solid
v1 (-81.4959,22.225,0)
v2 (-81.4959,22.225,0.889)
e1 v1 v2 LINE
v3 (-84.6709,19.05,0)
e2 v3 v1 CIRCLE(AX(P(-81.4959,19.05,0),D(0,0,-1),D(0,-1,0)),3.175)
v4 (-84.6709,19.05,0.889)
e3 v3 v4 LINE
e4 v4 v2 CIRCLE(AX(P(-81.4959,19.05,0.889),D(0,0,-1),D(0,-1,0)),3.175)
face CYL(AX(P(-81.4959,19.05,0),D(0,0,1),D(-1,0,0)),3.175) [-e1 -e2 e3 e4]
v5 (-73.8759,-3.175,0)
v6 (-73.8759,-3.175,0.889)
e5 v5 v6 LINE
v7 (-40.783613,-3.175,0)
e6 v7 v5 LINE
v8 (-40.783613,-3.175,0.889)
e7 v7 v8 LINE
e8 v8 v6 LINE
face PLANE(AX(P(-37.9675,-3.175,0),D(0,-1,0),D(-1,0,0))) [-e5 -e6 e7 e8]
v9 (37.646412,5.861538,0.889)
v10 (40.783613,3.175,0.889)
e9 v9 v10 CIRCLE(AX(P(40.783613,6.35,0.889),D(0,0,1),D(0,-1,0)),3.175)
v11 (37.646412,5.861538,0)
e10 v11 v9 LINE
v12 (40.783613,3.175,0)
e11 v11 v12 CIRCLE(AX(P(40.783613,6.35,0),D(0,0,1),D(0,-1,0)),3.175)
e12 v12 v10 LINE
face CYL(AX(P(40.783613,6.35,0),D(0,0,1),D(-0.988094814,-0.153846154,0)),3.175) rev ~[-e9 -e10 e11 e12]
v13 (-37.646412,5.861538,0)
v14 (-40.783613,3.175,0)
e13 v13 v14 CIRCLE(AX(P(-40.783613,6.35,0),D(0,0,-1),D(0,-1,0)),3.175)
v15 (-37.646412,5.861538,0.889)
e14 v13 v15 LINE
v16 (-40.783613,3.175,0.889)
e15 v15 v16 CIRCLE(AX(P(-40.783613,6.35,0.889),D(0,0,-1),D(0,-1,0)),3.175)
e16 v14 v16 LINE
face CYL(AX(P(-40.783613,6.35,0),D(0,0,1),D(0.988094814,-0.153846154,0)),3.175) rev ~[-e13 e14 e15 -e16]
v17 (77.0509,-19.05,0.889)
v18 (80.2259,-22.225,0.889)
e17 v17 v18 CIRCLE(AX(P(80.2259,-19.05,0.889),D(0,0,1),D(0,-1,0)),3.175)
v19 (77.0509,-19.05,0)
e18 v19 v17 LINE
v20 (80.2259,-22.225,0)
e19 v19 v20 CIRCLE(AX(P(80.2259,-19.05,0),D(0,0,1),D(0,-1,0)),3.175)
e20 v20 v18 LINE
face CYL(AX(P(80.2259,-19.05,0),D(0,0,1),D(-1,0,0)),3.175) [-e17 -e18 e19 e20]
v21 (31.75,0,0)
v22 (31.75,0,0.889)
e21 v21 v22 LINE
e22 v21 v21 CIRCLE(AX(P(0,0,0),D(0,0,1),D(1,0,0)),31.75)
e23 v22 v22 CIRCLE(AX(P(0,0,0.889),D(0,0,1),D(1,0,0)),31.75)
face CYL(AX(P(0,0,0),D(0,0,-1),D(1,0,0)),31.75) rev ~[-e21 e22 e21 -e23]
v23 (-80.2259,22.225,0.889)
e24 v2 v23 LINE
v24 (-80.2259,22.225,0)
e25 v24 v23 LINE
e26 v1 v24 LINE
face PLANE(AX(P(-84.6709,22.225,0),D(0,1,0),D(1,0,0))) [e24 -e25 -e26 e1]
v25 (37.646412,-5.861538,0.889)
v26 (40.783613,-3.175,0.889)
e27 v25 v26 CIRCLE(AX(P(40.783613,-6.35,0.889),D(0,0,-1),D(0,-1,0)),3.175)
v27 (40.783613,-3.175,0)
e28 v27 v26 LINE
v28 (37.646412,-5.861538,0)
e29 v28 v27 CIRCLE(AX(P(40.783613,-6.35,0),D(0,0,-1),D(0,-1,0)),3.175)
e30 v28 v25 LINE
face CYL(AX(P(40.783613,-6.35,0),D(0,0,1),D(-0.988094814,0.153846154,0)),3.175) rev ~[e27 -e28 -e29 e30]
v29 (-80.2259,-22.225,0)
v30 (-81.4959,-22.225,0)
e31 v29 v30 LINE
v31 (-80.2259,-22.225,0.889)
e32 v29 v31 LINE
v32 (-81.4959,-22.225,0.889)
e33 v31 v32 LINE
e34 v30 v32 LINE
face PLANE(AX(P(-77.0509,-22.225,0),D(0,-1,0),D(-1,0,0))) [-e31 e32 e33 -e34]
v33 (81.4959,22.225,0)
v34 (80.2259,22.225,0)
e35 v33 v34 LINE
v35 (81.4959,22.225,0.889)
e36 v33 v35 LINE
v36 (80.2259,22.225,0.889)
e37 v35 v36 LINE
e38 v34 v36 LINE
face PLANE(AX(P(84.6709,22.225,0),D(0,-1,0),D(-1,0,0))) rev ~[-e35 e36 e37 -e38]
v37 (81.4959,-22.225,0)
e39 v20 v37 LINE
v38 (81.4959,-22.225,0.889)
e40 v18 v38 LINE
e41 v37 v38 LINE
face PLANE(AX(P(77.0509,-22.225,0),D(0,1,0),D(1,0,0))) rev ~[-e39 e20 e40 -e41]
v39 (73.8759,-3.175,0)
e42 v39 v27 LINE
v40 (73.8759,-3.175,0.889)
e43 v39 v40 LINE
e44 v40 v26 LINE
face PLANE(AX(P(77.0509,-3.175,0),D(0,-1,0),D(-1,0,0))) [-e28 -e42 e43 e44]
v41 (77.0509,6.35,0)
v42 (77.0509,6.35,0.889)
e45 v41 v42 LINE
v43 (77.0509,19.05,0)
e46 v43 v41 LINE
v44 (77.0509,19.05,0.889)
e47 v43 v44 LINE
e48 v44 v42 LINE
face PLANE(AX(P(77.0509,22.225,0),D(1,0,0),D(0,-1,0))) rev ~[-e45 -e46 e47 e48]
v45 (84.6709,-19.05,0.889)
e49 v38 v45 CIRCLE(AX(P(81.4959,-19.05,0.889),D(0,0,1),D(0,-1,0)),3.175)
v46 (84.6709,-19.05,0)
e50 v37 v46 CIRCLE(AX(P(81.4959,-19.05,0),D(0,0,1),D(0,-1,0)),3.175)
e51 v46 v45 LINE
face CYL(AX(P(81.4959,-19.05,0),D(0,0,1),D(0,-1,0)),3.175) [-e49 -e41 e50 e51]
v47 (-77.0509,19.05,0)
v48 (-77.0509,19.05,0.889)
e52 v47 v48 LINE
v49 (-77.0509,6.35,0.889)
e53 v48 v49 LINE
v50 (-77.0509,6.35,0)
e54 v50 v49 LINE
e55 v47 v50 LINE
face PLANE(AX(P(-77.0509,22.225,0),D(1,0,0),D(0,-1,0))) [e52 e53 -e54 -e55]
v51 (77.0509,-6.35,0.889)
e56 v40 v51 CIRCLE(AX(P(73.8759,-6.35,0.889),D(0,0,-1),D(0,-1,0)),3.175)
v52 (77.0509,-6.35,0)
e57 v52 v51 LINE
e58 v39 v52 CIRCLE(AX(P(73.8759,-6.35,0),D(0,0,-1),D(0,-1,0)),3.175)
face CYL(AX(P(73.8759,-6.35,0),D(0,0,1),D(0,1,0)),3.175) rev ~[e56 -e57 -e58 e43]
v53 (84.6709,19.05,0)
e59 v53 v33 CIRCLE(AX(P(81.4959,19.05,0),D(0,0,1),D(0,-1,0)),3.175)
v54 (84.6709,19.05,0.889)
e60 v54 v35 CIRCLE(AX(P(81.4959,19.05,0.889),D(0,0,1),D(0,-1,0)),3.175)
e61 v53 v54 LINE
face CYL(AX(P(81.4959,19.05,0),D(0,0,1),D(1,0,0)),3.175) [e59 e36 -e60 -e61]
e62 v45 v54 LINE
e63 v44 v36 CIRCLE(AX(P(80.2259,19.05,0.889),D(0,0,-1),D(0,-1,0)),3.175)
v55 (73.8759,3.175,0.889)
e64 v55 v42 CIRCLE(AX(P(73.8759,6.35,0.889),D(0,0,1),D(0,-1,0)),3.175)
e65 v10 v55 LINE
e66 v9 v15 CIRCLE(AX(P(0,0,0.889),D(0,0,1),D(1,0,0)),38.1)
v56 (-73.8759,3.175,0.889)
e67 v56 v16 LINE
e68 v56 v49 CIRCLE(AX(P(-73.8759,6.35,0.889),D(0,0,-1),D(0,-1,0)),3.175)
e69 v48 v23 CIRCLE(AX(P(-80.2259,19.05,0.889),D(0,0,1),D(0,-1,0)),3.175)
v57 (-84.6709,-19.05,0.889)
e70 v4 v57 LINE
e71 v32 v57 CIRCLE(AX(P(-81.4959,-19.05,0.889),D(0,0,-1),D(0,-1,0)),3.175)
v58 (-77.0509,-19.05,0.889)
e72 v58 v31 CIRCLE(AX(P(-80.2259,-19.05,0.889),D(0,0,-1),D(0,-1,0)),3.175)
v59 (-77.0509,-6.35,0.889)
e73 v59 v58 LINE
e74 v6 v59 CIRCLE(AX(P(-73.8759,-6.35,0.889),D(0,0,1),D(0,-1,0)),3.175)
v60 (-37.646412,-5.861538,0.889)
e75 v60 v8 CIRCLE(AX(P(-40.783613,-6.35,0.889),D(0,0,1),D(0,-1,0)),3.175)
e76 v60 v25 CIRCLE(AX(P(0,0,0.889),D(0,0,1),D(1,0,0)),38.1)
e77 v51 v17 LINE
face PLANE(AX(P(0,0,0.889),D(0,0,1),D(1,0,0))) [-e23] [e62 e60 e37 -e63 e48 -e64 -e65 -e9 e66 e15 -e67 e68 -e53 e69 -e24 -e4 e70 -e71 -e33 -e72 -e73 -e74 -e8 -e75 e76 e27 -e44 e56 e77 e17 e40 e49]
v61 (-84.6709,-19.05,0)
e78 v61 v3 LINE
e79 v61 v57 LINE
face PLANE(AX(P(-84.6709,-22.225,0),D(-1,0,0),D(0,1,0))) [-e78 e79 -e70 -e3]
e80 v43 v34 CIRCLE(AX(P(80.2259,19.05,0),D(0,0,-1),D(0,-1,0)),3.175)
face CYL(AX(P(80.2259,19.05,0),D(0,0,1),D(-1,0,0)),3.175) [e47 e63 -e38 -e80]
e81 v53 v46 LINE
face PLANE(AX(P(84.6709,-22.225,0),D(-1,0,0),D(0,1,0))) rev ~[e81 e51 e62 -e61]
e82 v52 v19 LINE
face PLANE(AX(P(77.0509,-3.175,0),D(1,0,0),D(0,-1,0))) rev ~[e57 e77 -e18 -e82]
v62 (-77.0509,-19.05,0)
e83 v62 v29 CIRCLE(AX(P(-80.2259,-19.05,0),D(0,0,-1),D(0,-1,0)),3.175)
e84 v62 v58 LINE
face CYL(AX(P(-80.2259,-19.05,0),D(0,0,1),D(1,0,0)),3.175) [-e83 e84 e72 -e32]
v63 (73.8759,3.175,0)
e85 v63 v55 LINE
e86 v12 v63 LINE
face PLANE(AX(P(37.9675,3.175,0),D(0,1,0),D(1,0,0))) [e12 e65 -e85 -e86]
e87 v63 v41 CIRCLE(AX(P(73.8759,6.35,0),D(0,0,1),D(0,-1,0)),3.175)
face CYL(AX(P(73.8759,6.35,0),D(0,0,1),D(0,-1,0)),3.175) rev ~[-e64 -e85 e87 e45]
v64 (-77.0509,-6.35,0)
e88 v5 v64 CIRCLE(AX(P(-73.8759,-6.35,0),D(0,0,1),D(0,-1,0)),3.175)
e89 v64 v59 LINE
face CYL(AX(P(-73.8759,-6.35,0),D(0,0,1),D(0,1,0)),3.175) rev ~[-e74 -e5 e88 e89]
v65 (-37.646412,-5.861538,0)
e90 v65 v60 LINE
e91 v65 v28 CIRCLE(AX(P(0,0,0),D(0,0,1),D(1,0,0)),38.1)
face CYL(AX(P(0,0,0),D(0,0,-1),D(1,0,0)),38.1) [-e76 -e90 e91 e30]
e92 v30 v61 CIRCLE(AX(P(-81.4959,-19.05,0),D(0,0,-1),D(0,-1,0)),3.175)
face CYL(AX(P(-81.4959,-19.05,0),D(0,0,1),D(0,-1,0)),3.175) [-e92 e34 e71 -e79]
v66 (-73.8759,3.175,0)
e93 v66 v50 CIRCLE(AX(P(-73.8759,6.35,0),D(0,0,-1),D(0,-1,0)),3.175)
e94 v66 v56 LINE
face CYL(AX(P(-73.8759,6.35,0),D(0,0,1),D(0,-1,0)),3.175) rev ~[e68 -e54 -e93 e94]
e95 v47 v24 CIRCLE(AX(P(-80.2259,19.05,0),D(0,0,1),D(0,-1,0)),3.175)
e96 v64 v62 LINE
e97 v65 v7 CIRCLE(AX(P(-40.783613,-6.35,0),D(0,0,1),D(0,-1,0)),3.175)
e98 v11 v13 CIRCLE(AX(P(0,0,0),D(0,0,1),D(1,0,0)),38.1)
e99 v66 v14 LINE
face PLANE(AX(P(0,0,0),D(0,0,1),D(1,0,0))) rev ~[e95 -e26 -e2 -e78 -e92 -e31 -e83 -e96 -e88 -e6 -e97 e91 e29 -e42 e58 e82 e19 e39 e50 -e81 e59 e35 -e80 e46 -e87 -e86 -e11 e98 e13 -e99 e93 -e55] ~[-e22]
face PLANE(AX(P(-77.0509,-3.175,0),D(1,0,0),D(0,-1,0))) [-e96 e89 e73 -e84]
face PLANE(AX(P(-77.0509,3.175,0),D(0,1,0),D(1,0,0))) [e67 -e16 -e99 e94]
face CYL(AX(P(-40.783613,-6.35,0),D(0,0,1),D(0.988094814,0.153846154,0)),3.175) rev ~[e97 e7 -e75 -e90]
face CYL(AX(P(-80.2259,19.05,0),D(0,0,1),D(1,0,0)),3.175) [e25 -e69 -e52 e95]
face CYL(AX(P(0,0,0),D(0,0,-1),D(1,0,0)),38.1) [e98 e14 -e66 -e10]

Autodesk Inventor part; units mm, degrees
ref_plane "YZ Plane" through (0, 0, 0) normal (1, 0, 0) x (0, 1, 0)
ref_plane "XZ Plane" through (0, 0, 0) normal (0, 1, 0) x (-1, 0, 0)
ref_plane "XY Plane" through (0, 0, 0) normal (0, 0, 1) x (1, 0, 0)
sketch "Sketch1" plane through (0, 0, 0) normal (0, 0, 1) x (1, 0, 0)
  circle A0 centre (0, 0) radius 38.1
  circle A1 centre (0, 0) radius 31.75
  line L0 (-84.6709, -3.175) -> (-84.6709, 3.175)
  line L1 (84.6709, 3.175) -> (84.6709, -3.175)
  line L2 (84.6709, -3.175) -> (-84.6709, 3.175) construction
  line L3 (-84.6709, -3.175) -> (84.6709, 3.175) construction
  line L4 (84.6709, -3.175) -> (37.9675, -3.175)
  line L5 (-37.9675, -3.175) -> (-84.6709, -3.175)
  line L6 (-84.6709, 3.175) -> (-37.9675, 3.175)
  line L7 (37.9675, 3.175) -> (84.6709, 3.175)
  line L8 (-84.6709, 22.225) -> (-77.0509, 22.225)
  line L9 (-77.0509, 22.225) -> (-77.0509, -22.225)
  line L10 (-77.0509, -22.225) -> (-84.6709, -22.225)
  line L11 (-84.6709, -22.225) -> (-84.6709, 22.225)
  line L12 (0, 31.75) -> (0, -31.75) construction
  line L13 (84.6709, 22.225) -> (77.0509, 22.225)
  line L14 (77.0509, 22.225) -> (77.0509, -22.225)
  line L15 (77.0509, -22.225) -> (84.6709, -22.225)
  line L16 (84.6709, -22.225) -> (84.6709, 22.225)
  dimension "d0" = 76.2
  dimension "d1" = 6.35
  dimension "d2" = 169.3418
  dimension "d4" = 6.35
  dimension "d5" = 19.05
  dimension "d6" = 19.05
  dimension "d7" = 7.62
extrude "Plate1" add sketch "Sketch1" along normal blind 0.889
fillet "Corner Round1" radius 3.175 16 edges at (77.0509, -3.175, 0.4445) (77.0509, -22.225, 0.4445) (77.0509, 3.175, 0.4445) (77.0509, 22.225, 0.4445) (84.6709, -22.225, 0.4445) (84.6709, 22.225, 0.4445) (37.9675, -3.175, 0.4445) (-77.0509, -3.175, 0.4445) (-77.0509, -22.225, 0.4445) (-77.0509, 3.175, 0.4445) (-77.0509, 22.225, 0.4445) (-84.6709, -22.225, 0.4445) (-84.6709, 22.225, 0.4445) (-37.9675, 3.175, 0.4445) (-37.9675, -3.175, 0.4445) (37.9675, 3.175, 0.4445)
equation "\"d8\" = Thickness"
equation "\"BendRadius\" = Thickness"
equation "\"BendReliefWidth\" = Thickness"
equation "\"BendReliefDepth\" = 0.5 * Thickness"
equation "\"CornerReliefSize\" = 4 * Thickness"
equation "\"MinimumRemnant\" = 2 * Thickness"
equation "\"TransitionRadius\" = BendRadius"
equation "\"JacobiRadiusSize\" = Thickness"
equation "\"GapSize\" = Thickness"
equation "\"Thickness\" = 0.889"
properties part number "Frame" material "Aluminum 6061"
